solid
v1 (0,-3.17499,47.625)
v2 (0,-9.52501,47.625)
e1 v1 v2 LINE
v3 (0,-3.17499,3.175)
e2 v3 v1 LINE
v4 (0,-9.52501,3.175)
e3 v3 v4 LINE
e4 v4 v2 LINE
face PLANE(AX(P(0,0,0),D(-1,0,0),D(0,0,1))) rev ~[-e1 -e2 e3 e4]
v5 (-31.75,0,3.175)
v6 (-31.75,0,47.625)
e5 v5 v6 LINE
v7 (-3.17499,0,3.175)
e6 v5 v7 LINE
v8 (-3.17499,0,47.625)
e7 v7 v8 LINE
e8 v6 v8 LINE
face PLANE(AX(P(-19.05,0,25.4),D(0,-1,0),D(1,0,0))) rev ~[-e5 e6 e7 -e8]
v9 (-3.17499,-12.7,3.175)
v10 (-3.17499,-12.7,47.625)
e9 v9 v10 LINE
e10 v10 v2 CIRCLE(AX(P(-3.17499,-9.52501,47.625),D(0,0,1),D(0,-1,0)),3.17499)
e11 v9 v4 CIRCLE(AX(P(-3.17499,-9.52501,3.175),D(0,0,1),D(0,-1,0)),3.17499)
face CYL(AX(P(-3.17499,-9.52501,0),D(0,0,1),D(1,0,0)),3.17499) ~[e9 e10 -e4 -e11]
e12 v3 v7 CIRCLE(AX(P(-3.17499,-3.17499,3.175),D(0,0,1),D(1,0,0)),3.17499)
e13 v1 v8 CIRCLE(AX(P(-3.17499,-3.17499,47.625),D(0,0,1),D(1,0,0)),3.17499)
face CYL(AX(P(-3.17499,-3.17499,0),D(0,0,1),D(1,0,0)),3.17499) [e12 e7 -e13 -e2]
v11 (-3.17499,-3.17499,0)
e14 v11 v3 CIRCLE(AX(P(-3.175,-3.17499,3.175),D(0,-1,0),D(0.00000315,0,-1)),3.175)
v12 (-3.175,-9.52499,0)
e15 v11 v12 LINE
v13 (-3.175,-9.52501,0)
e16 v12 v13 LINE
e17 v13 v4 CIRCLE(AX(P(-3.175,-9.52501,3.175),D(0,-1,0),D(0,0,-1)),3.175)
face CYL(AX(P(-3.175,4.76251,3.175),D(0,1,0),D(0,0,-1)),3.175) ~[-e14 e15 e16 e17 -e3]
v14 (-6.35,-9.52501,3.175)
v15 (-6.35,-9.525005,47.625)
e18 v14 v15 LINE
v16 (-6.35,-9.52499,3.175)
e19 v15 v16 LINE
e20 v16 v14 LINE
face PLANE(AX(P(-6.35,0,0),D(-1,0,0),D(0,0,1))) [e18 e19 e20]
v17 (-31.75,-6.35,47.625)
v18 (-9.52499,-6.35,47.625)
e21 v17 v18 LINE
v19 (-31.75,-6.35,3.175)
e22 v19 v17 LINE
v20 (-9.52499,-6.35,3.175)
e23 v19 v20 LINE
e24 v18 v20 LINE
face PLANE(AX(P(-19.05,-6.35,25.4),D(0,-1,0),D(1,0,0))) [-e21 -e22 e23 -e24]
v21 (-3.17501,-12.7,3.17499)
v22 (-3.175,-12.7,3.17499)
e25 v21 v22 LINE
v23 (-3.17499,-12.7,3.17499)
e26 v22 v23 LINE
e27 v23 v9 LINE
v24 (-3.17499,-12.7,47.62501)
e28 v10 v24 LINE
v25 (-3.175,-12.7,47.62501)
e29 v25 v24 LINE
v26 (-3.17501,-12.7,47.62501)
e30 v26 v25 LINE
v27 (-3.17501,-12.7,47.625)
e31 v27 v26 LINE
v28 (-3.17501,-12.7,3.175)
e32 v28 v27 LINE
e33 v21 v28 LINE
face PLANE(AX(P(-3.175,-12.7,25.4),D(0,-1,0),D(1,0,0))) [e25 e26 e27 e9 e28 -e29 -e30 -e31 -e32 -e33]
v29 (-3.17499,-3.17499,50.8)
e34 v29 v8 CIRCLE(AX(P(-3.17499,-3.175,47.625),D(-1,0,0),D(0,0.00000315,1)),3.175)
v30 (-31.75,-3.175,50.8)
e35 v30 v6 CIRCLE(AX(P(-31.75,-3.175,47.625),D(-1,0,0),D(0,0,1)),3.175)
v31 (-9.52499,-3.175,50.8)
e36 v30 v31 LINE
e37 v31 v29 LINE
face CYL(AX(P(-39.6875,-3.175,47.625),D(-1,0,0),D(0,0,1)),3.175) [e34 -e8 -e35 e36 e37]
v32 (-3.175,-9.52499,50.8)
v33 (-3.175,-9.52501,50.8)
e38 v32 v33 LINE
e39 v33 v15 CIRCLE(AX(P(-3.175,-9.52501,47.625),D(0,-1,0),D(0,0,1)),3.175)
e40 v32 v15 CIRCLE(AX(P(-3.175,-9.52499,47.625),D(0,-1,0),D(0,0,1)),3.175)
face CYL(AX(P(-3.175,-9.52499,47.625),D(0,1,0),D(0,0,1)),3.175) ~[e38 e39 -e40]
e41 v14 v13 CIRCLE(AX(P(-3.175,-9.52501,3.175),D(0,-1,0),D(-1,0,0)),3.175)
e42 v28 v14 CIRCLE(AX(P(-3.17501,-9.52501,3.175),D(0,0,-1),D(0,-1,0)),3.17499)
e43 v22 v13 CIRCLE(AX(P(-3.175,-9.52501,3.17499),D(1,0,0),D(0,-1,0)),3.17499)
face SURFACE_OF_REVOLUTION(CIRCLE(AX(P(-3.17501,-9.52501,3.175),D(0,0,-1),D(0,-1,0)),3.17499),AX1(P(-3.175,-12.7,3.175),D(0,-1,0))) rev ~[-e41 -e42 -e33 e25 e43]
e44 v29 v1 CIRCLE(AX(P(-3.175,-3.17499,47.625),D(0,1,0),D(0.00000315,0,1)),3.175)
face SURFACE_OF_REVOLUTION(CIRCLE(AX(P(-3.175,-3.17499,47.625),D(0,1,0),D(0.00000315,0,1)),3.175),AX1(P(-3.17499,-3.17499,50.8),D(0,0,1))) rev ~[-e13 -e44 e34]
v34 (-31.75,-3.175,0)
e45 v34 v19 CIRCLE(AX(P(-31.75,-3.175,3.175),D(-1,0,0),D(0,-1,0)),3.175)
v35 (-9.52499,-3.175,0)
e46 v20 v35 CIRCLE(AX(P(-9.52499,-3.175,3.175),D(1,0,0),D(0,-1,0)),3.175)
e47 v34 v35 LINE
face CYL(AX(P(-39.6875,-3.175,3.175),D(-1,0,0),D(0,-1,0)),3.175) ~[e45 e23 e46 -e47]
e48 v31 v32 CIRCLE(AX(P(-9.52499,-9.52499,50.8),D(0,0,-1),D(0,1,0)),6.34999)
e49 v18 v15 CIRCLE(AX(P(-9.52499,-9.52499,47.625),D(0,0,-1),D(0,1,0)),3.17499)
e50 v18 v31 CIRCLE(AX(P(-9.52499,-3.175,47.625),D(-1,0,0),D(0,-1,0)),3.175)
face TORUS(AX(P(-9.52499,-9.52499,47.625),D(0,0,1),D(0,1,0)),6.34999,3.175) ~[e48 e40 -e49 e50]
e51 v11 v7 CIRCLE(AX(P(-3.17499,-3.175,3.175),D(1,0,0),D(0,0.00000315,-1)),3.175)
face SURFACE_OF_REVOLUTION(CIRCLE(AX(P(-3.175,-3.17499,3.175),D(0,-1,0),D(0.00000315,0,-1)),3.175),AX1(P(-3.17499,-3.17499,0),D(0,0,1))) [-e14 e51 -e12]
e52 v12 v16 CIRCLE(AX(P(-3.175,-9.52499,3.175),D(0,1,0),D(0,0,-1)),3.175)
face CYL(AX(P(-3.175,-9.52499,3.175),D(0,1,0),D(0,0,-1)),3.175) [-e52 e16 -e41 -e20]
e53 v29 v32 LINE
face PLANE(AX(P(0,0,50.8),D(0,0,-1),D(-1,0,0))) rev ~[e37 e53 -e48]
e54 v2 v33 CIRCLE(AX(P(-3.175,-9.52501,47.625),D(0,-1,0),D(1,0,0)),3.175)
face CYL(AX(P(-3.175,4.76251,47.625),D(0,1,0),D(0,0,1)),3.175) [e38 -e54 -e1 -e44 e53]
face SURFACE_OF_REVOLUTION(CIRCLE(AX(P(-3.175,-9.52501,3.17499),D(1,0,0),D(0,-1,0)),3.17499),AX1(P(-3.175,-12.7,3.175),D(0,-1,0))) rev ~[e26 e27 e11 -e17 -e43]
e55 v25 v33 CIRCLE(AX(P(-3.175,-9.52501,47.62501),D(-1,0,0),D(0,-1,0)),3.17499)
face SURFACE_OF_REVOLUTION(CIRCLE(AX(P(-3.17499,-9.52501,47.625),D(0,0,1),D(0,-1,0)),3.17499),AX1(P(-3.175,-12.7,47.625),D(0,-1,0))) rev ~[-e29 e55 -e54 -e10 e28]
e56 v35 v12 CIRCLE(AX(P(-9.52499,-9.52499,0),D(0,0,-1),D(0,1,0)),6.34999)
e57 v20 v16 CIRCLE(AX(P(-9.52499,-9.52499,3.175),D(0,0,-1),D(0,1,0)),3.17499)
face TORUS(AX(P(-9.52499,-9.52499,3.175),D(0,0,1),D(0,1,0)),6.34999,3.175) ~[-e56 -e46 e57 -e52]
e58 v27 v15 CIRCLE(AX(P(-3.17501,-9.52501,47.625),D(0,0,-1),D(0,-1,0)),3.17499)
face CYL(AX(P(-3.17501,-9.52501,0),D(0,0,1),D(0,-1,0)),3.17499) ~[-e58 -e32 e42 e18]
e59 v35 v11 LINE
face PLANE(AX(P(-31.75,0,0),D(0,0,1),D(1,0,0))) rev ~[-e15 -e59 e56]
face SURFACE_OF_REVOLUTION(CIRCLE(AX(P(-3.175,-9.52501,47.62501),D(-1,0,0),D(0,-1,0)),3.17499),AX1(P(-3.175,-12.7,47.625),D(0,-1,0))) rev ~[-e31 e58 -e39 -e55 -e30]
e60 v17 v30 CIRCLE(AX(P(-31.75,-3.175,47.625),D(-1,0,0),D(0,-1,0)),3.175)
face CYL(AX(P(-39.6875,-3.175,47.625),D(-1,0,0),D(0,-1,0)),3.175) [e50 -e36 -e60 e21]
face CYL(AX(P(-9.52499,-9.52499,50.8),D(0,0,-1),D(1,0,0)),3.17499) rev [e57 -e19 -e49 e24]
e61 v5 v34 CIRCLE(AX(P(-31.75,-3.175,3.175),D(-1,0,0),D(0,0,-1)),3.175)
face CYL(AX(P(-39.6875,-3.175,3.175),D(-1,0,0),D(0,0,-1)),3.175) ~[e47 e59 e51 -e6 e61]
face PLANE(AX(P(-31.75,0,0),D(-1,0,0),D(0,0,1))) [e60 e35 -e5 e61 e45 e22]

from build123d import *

# Parameters (mm, degrees)
F0_W         = 25.4
F0_H         = 50.8
F0_W_2       = 6.35
F1_DEPTH     = 6.35
F2_DEPTH     = 12.7
F3_R         = 3.17499
F4_T1_DEPTH  = 30.16251
F4_T3_DEPTH  = 44.45001
F4_T5_DEPTH  = 17.46251
F4_T7_DEPTH  = 3.17501
F4_T10_ANGLE = 90
F4_T12_ANGLE = 90
F4_T14_ANGLE = 90
F4_T16_ANGLE = 90
F4_T18_ANGLE = 90
F4_T20_ANGLE = 90
F4_T22_ANGLE = 90
F4_T24_ANGLE = 90


# Not quite as in the source:
# - a fillet or chamfer that OpenCascade refuses, or shapes differently, is made with other operations: its cross-section is extruded or revolved along the edge and cut away or added
# - a fillet or chamfer is up to 0.001 mm smaller than in the source, because OpenCascade refuses the exact size


with BuildPart() as f1:
    # F0 (on Front) → F1 (new body)
    with BuildSketch(Plane.XZ):
        with Locations((-19.05, 25.4)):
            Rectangle(F0_W, F0_H)
        with Locations((-3.175, 25.4)):
            Rectangle(F0_W_2, F0_H)
    extrude(amount=F1_DEPTH)

    # F0 (on Front) → F2 (join)
    with BuildSketch(Plane.XZ):
        with Locations((-3.175, 25.4)):
            Rectangle(F0_W_2, F0_H)
    extrude(amount=F2_DEPTH)

    # F3 (radius 3.175 in the source; OpenCascade refuses exactly that, so slightly less here)
    f3_edges = [f1.edges().sort_by_distance(p)[0] for p in [
        (0, 0, 25.4),
        (-6.35, -6.35, 25.4),
        (-3.175, -12.7, 0),
        (0, -12.7, 25.4),
        (-3.175, -12.7, 50.8),
        (-6.35, -12.7, 25.4),
    ]]
    fillet(f3_edges, radius=F3_R)

    # F4: fillet of radius 3.175 on 4 edges, made by hand

    # F4_s2 → F4_t1 (cut)
    with BuildSketch(Plane.YZ.offset(-39.6875)):
        with BuildLine():
            ThreePointArc((-6.35, 47.625), (-5.4200640303, 49.8700640303), (-3.175, 50.8))
            Line((-3.175, 50.8), (-6.35, 50.8))
            Line((-6.35, 50.8), (-6.35, 47.625))
        make_face()
        with BuildLine():
            ThreePointArc((-6.35, 3.175), (-5.4200640303, 0.9299359697), (-3.175, 0))
            Line((-3.175, 0), (-6.35, 0))
            Line((-6.35, 0), (-6.35, 3.175))
        make_face()
    extrude(amount=F4_T1_DEPTH, mode=Mode.SUBTRACT)

    # F4_s4 → F4_t3 (cut)
    with BuildSketch(Plane.YZ.offset(-39.6875)):
        with BuildLine():
            ThreePointArc((-3.175, 0), (-0.9299359697, 0.9299359697), (0, 3.175))
            Line((0, 3.175), (0, 0))
            Line((0, 0), (-3.175, 0))
        make_face()
        with BuildLine():
            ThreePointArc((-3.175, 50.8), (-0.9299359697, 49.8700640303), (0, 47.625))
            Line((0, 47.625), (0, 50.8))
            Line((0, 50.8), (-3.175, 50.8))
        make_face()
    extrude(amount=F4_T3_DEPTH, mode=Mode.SUBTRACT)

    # F4_s6 → F4_t5 (cut)
    with BuildSketch(Plane.XZ.offset(-4.76251)):
        with BuildLine():
            ThreePointArc((-3.175, 50.8), (-0.9299359697, 49.8700640303), (0, 47.625))
            Line((0, 47.625), (0, 50.8))
            Line((0, 50.8), (-3.175, 50.8))
        make_face()
        with BuildLine():
            ThreePointArc((-3.175, 0), (-0.9299359697, 0.9299359697), (0, 3.175))
            Line((0, 3.175), (0, 0))
            Line((0, 0), (-3.175, 0))
        make_face()
    extrude(amount=F4_T5_DEPTH, mode=Mode.SUBTRACT)

    # F4_s8 → F4_t7 (cut)
    with BuildSketch(Plane.XZ.offset(9.52499)):
        with BuildLine():
            ThreePointArc((-3.175, 0), (-5.4200640303, 0.9299359697), (-6.35, 3.175))
            Line((-6.35, 3.175), (-6.35, 0))
            Line((-6.35, 0), (-3.175, 0))
        make_face()
        with BuildLine():
            ThreePointArc((-3.175, 50.8), (-5.4200640303, 49.8700640303), (-6.35, 47.625))
            Line((-6.35, 47.625), (-6.35, 50.8))
            Line((-6.35, 50.8), (-3.175, 50.8))
        make_face()
    extrude(amount=F4_T7_DEPTH, mode=Mode.SUBTRACT)

    # F4_s9 → F4_t10 (revolve, cut)
    with BuildSketch(Plane.XY.offset(47.625)):
        with BuildLine():
            ThreePointArc((-3.17499, -12.7), (-0.9299330408, -11.7700669592), (0, -9.52501))
            Line((0, -9.52501), (0, -12.7))
            Line((0, -12.7), (-3.17499, -12.7))
        make_face()
    revolve(axis=Axis((-3.175, -12.7, 47.625), (0, -1, 0)), revolution_arc=F4_T10_ANGLE, mode=Mode.SUBTRACT)

    # F4_s11 → F4_t12 (revolve, cut)
    with BuildSketch(Plane.YZ.offset(-3.175)):
        with BuildLine():
            ThreePointArc((-12.7, 3.17499), (-11.7700669592, 0.9299330408), (-9.52501, 0))
            Line((-9.52501, 0), (-12.7, 0))
            Line((-12.7, 0), (-12.7, 3.17499))
        make_face()
    revolve(axis=Axis((-3.175, -12.7, 3.175), (0, -1, 0)), revolution_arc=F4_T12_ANGLE, mode=Mode.SUBTRACT)

    # F4_s13 → F4_t14 (revolve, cut)
    with BuildSketch(Plane.XY.offset(3.175)):
        with BuildLine():
            ThreePointArc((-3.17501, -12.7), (-5.4200669592, -11.7700669592), (-6.35, -9.52501))
            Line((-6.35, -9.52501), (-6.35, -12.7))
            Line((-6.35, -12.7), (-3.17501, -12.7))
        make_face()
    revolve(axis=Axis((-3.175, -12.7, 3.175), (0, -1, 0)), revolution_arc=F4_T14_ANGLE, mode=Mode.SUBTRACT)

    # F4_s15 → F4_t16 (revolve, cut)
    with BuildSketch(Plane.YZ.offset(-3.175)):
        with BuildLine():
            ThreePointArc((-12.7, 47.62501), (-11.7700669592, 49.8700669592), (-9.52501, 50.8))
            Line((-9.52501, 50.8), (-12.7, 50.8))
            Line((-12.7, 50.8), (-12.7, 47.62501))
        make_face()
    revolve(axis=Axis((-3.175, -12.7, 47.625), (0, -1, 0)), revolution_arc=F4_T16_ANGLE, mode=Mode.SUBTRACT)

    # F4_s17 → F4_t18 (revolve, cut)
    with BuildSketch(Plane.XZ.offset(3.17499)):
        with BuildLine():
            ThreePointArc((-3.17499, 50.8), (-0.9299324342, 49.8700604947), (0, 47.625))
            Line((0, 47.625), (0, 50.8))
            Line((0, 50.8), (-3.17499, 50.8))
        make_face()
    revolve(axis=Axis((-3.17499, -3.17499, 50.8), (0, 0, 1)), revolution_arc=F4_T18_ANGLE, mode=Mode.SUBTRACT)

    # F4_s19 → F4_t20 (revolve, cut)
    with BuildSketch(Plane.XZ.offset(3.17499)):
        with BuildLine():
            ThreePointArc((-3.17499, 0), (-0.9299324342, 0.9299395053), (0, 3.175))
            Line((0, 3.175), (0, 0))
            Line((0, 0), (-3.17499, 0))
        make_face()
    revolve(axis=Axis((-3.17499, -3.17499, 0), (0, 0, 1)), revolution_arc=F4_T20_ANGLE, mode=Mode.SUBTRACT)

    # F4_s21 → F4_t22 (revolve, cut)
    with BuildSketch(Plane.YZ.offset(-9.52499)):
        with BuildLine():
            ThreePointArc((-6.35, 3.175), (-5.4200640303, 0.9299359697), (-3.175, 0))
            Line((-3.175, 0), (-6.35, 0))
            Line((-6.35, 0), (-6.35, 3.175))
        make_face()
    revolve(axis=Axis((-9.52499, -9.52499, 0), (0, 0, -1)), revolution_arc=F4_T22_ANGLE, mode=Mode.SUBTRACT)

    # F4_s23 → F4_t24 (revolve, cut)
    with BuildSketch(Plane.YZ.offset(-9.52499)):
        with BuildLine():
            ThreePointArc((-3.175, 50.8), (-5.4200640303, 49.8700640303), (-6.35, 47.625))
            Line((-6.35, 47.625), (-6.35, 50.8))
            Line((-6.35, 50.8), (-3.175, 50.8))
        make_face()
    revolve(axis=Axis((-9.52499, -9.52499, 50.8), (0, 0, -1)), revolution_arc=F4_T24_ANGLE, mode=Mode.SUBTRACT)


solid = f1.part
